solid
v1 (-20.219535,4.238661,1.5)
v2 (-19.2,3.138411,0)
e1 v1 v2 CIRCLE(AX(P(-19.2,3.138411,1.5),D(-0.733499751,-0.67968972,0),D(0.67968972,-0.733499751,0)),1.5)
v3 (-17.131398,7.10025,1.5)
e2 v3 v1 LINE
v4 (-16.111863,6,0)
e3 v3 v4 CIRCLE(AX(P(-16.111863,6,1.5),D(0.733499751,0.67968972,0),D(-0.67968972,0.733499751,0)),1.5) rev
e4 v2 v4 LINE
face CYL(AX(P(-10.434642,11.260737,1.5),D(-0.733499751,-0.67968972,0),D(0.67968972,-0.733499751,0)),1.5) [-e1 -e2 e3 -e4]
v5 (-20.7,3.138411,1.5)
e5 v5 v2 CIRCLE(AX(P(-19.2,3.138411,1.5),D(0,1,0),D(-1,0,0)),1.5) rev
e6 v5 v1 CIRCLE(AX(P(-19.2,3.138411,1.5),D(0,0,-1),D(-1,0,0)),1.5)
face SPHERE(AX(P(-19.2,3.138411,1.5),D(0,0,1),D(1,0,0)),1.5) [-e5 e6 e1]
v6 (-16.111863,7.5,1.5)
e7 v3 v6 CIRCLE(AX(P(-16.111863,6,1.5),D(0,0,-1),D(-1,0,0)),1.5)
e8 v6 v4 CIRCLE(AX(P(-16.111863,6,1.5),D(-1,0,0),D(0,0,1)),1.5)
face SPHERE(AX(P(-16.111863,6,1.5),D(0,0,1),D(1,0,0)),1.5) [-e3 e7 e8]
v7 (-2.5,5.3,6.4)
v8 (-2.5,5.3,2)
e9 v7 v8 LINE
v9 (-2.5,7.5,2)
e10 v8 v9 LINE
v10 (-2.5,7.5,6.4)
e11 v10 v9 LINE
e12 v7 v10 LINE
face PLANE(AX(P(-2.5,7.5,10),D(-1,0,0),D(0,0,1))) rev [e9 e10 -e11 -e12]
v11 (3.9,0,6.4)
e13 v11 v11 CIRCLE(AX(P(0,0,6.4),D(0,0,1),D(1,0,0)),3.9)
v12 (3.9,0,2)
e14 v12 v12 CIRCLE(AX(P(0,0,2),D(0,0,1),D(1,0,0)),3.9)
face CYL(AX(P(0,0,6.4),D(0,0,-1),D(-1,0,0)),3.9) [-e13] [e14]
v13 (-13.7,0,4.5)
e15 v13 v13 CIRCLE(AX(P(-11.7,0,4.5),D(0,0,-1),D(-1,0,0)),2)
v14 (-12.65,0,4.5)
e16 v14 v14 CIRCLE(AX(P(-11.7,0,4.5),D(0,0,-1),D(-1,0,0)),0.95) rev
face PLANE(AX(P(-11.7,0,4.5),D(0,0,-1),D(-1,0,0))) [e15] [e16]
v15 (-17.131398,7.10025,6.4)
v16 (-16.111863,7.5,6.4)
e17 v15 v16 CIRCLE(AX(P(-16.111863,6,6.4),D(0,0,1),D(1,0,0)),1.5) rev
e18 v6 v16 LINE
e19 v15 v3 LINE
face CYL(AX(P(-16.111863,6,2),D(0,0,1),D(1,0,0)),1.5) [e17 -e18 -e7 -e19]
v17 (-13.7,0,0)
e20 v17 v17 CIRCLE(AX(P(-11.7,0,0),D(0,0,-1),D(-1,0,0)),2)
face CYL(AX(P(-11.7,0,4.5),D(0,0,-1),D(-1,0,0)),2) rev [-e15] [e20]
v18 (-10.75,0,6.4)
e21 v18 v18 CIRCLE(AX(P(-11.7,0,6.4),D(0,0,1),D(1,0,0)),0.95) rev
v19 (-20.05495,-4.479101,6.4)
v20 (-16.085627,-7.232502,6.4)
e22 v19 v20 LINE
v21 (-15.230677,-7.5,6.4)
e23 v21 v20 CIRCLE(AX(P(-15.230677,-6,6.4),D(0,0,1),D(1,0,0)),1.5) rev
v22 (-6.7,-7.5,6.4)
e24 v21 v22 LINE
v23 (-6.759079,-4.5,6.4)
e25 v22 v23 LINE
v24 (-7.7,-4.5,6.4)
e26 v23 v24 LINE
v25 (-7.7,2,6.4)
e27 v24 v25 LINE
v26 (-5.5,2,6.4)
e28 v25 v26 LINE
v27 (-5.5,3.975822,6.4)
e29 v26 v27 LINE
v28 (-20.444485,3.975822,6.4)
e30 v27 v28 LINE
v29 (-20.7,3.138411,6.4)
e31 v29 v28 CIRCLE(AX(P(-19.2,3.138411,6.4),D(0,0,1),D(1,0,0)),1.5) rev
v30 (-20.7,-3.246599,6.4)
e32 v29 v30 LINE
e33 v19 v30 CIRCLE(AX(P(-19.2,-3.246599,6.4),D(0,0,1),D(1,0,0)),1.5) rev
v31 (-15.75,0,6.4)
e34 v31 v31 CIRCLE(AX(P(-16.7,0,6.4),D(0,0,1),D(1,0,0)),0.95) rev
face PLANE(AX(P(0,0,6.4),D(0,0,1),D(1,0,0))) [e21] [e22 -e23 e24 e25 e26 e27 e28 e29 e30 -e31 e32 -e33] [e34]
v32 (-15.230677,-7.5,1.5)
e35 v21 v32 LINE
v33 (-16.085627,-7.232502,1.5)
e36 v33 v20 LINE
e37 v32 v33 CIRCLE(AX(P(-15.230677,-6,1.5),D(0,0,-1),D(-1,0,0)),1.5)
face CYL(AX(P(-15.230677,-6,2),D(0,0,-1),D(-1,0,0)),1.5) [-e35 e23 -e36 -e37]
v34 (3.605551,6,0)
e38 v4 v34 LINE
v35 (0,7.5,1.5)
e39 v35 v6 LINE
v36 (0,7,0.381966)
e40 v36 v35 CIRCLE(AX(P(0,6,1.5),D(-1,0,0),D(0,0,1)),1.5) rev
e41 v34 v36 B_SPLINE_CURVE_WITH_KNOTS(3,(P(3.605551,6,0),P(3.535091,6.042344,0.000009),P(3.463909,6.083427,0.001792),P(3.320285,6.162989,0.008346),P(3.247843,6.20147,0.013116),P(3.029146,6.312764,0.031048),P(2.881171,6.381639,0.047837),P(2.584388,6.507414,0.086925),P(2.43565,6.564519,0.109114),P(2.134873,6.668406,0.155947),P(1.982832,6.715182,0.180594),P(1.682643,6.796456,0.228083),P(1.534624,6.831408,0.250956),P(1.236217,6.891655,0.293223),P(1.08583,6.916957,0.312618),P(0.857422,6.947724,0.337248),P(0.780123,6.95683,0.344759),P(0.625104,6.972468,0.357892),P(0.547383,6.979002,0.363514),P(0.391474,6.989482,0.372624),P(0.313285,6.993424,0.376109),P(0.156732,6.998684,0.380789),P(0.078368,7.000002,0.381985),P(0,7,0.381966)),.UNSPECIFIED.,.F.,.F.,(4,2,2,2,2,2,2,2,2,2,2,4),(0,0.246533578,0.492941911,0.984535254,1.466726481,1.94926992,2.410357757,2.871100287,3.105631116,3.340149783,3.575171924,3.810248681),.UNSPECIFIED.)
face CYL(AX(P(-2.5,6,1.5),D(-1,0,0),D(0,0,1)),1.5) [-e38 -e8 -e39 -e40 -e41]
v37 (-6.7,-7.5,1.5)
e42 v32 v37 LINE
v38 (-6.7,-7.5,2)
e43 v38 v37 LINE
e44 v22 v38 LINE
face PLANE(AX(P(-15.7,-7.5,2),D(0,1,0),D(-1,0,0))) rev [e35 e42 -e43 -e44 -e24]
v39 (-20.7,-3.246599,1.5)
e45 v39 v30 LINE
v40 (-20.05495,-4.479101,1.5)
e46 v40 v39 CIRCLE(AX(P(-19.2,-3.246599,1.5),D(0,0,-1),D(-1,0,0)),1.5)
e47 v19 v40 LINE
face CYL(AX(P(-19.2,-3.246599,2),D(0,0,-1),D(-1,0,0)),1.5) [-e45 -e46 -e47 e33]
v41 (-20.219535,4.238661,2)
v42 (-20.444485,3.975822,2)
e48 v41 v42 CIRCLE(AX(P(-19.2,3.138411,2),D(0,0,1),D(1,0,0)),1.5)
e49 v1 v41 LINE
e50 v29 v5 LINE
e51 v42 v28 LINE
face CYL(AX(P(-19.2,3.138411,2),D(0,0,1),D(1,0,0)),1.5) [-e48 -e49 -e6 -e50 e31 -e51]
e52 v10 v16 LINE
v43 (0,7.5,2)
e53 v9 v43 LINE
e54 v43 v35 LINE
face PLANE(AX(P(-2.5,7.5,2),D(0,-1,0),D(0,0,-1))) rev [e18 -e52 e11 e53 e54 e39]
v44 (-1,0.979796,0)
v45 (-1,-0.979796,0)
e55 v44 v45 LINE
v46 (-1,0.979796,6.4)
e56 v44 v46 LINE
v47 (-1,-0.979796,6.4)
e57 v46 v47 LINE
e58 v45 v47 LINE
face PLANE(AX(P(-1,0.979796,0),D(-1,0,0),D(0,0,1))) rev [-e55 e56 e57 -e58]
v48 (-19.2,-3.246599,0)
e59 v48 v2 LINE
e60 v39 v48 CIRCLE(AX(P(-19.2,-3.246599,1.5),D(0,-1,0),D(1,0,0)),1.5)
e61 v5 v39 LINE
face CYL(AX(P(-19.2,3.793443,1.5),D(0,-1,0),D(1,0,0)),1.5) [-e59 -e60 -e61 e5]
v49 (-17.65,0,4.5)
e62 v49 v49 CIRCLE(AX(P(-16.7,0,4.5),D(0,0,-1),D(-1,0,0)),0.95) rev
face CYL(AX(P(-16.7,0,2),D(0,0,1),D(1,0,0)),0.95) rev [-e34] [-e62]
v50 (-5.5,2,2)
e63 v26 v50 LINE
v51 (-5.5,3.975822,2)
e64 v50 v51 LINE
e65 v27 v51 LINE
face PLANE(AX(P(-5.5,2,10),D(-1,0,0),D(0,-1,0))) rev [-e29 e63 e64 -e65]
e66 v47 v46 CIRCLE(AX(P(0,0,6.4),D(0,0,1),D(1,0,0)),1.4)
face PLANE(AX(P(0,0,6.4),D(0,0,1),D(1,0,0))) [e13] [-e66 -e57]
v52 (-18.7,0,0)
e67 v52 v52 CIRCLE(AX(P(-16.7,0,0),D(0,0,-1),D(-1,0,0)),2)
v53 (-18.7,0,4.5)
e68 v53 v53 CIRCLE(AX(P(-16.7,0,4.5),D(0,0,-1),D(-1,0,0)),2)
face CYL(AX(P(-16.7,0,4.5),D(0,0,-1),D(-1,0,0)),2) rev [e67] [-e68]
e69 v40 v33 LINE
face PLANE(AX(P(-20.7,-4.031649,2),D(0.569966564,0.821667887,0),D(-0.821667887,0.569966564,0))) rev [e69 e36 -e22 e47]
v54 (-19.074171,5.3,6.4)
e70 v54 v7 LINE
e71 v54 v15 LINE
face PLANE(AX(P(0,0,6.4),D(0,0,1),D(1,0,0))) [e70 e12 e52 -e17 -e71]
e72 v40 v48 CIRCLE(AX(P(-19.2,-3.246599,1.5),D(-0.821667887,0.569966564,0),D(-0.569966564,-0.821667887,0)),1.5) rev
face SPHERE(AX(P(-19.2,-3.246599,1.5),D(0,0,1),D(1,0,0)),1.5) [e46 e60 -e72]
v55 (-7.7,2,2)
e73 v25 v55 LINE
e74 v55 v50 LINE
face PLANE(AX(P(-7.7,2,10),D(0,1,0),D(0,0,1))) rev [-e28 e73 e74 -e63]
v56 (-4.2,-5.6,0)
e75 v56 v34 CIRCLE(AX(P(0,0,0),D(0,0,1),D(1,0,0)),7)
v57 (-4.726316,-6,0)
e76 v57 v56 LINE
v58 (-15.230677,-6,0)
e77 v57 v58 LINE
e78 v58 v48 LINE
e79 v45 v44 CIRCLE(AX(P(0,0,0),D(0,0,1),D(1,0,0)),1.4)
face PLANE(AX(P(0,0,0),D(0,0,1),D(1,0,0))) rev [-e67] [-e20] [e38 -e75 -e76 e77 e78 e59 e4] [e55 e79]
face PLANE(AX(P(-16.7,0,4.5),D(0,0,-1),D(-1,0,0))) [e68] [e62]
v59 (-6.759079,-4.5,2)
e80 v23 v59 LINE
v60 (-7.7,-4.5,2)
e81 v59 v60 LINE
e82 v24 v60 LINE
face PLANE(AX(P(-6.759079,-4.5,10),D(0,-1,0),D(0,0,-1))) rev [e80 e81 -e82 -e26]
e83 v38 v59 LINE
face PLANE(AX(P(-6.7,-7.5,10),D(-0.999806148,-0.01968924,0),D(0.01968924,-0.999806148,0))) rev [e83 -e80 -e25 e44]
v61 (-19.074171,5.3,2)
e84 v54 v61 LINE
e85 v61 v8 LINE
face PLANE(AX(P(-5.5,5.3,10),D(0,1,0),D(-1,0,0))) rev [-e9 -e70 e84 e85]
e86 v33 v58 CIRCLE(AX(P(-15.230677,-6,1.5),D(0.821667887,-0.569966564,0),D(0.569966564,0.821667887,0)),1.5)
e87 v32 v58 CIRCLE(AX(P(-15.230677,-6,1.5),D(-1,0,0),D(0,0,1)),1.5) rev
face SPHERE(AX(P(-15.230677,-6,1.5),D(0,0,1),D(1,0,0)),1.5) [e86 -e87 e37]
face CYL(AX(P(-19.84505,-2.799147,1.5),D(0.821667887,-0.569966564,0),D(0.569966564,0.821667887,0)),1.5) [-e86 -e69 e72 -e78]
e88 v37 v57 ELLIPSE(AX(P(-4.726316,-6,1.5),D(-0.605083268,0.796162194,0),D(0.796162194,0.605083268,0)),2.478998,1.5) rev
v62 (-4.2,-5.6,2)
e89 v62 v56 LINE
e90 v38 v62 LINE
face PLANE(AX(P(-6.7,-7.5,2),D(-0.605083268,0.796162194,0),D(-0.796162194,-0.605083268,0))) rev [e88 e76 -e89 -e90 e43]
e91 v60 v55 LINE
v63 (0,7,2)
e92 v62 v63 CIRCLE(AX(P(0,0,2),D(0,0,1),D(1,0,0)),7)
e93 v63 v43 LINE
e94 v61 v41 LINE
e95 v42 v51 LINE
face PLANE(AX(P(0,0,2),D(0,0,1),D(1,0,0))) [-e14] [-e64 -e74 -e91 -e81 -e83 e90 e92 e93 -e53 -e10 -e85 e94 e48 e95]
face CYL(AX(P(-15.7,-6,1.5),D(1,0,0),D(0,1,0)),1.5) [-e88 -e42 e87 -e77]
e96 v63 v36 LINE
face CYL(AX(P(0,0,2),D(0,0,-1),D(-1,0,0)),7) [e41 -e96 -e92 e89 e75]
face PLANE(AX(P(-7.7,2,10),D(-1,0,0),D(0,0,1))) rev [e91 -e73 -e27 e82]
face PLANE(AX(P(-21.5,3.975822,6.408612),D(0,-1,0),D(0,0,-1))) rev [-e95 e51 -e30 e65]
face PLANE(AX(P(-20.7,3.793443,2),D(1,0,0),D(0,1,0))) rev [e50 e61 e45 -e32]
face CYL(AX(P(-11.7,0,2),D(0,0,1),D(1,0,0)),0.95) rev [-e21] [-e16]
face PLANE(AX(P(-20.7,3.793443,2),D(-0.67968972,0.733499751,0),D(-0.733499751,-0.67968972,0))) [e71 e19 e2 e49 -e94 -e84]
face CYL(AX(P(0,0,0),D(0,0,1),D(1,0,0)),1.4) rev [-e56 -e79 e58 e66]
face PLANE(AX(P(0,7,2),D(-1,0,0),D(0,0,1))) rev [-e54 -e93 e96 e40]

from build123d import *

# Parameters (mm, degrees)
BOSS_EXTRUDE1_DEPTH = 2
BOSS_EXTRUDE2_DEPTH = 8
SKETCH24_R          = 3.9
BOSS_EXTRUDE5_DEPTH = 4.4
SKETCH30_W          = 4.40861202
SKETCH30_H          = 1.324178481
CUT_EXTRUDE12_DEPTH = 16
CUT_EXTRUDE11_DEPTH = 23.928148639
FILLET1_R           = 1.5
SKETCH34_W          = 1.5
SKETCH34_H          = 1.5
CUT_EXTRUDE13_DEPTH = 8
SKETCH36_R          = 0.95
CUT_EXTRUDE15_DEPTH = 8
SKETCH37_R          = 2
CUT_EXTRUDE16_DEPTH = 4.5
SKETCH38_W          = 3
SKETCH38_H          = 1.25
CUT_EXTRUDE17_DEPTH = 3.6


with BuildPart() as part:
    # Sketch2 → Boss-Extrude1 (new body)
    with BuildSketch(Plane.XY):
        with BuildLine():
            Line((-2.5, 7.5), (-16.7, 7.5))
            Line((-16.7, 7.5), (-20.7, 3.793442666))
            Line((-20.7, 3.793442666), (-20.7, -4.031648778))
            Line((-20.7, -4.031648778), (-15.7, -7.5))
            Line((-15.7, -7.5), (-6.7, -7.5))
            Line((-6.7, -7.5), (-4.2, -5.6))
            ThreePointArc((-4.2, -5.6), (3.130495168, -6.260990337), (7, 0))
            ThreePointArc((7, 0), (4.949747468, 4.949747468), (0, 7))
            Line((0, 7), (0, 7.5))
            Line((0, 7.5), (-2.5, 7.5))
        make_face()
    extrude(amount=BOSS_EXTRUDE1_DEPTH)

    # Sketch4 → Boss-Extrude2 (add)
    with BuildSketch(Plane.XY.offset(2)):
        Polygon((-15.7, -7.5), (-6.7, -7.5), (-6.759079174, -4.5), (-7.7, -4.5), (-7.7, 2), (-5.5, 2), (-5.5, 5.3), (-2.5, 5.3), (-2.5, 7.5), (-16.7, 7.5), (-20.7, 3.793442666), (-20.7, -4.031648778), align=None)
    extrude(amount=BOSS_EXTRUDE2_DEPTH)

    # Sketch24 → Boss-Extrude5 (add)
    with BuildSketch(Plane.XY.offset(2)):
        Circle(SKETCH24_R)
    extrude(amount=BOSS_EXTRUDE5_DEPTH)

    # Sketch30 → Cut-Extrude12 (cut)
    with BuildSketch(Plane(origin=(-5.5, 0, 0), x_dir=(0, 0, -1), z_dir=(1, 0, 0))):
        with Locations((-4.20430601, 4.63791076)):
            Rectangle(SKETCH30_W, SKETCH30_H)
    extrude(amount=-CUT_EXTRUDE12_DEPTH, mode=Mode.SUBTRACT)

    # Sketch28 → Cut-Extrude11 (cut, through all)
    with BuildSketch(Plane.XY.offset(6.4)):
        with BuildLine():
            Line((-1, 0.979795897), (-1, -0.979795897))
            ThreePointArc((-1, -0.979795897), (1.4, 0), (-1, 0.979795897))
        make_face()
    extrude(amount=-CUT_EXTRUDE11_DEPTH, mode=Mode.SUBTRACT)

    # Fillet1
    # the kernel refuses this fillet: 1.5 mm, written as the material it takes off along each edge
    with BuildSketch(Plane(origin=(-15.230677435, -6, 1.5), x_dir=(-0.5699665637840448, -0.8216678867816415, 0), z_dir=(0, 0, -1))) as fillet1_piece_1_section:
        Polygon((0, 0), (FILLET1_R * 1.02, 0), (FILLET1_R * 1.02, -FILLET1_R * 0.319139344377), (FILLET1_R * 0.838101244517, -FILLET1_R * 0.58136589506), align=None)
    fillet1_piece_1 = extrude(amount=FILLET1_R * 1.02, mode=Mode.PRIVATE)
    fillet1_piece_1 = fillet1_piece_1 - Plane(origin=(-15.230677435, -6, 1.5), x_dir=(0.29860685961507855, 0.9543762064253388, 0), z_dir=(0, 0, -1)) * Sphere(FILLET1_R, mode=Mode.PRIVATE)
    add(fillet1_piece_1, mode=Mode.SUBTRACT)
    with BuildSketch(Plane(origin=(-16.11186344, 6, 1.5), x_dir=(-0.6796897201843015, 0.7334997506991983, 0), z_dir=(0, 0, -1))) as fillet1_piece_2_section:
        Polygon((0, 0), (FILLET1_R * 1.02, 0), (FILLET1_R * 1.02, FILLET1_R * 0.399932860855), (FILLET1_R * 0.748169745713, FILLET1_R * 0.693283514588), align=None)
    fillet1_piece_2 = extrude(amount=FILLET1_R * 1.02, mode=Mode.PRIVATE)
    fillet1_piece_2 = fillet1_piece_2 - Plane(origin=(-16.11186344, 6, 1.5), x_dir=(0.3650344157067945, -0.9309940254102596, 0), z_dir=(0, 0, -1)) * Sphere(FILLET1_R, mode=Mode.PRIVATE)
    add(fillet1_piece_2, mode=Mode.SUBTRACT)
    with BuildSketch(Plane(origin=(-19.2, 3.138411196, 1.5), x_dir=(-0.6796897201843015, 0.7334997506991983, 0), z_dir=(0, 0, -1))) as fillet1_piece_3_section:
        Polygon((0, 0), (FILLET1_R * 1.02, 0), (FILLET1_R * 1.02, -FILLET1_R * 0.445421399395), (FILLET1_R * 0.693283514588, -FILLET1_R * 0.748169745713), align=None)
    fillet1_piece_3 = extrude(amount=FILLET1_R * 1.02, mode=Mode.PRIVATE)
    fillet1_piece_3 = fillet1_piece_3 - Plane(origin=(-19.2, 3.138411196, 1.5), x_dir=(0.9164304993244992, -0.40019387789901173, 0), z_dir=(0, 0, -1)) * Sphere(FILLET1_R, mode=Mode.PRIVATE)
    add(fillet1_piece_3, mode=Mode.SUBTRACT)
    with BuildSketch(Plane(origin=(-19.2, -3.246599046, 1.5), x_dir=(-0.5699665637840448, -0.8216678867816415, 0), z_dir=(0, 0, -1))) as fillet1_piece_4_section:
        Polygon((0, 0), (FILLET1_R * 1.02, 0), (FILLET1_R * 1.02, FILLET1_R * 0.533833817771), (FILLET1_R * 0.58136589506, FILLET1_R * 0.838101244517), align=None)
    fillet1_piece_4 = extrude(amount=FILLET1_R * 1.02, mode=Mode.PRIVATE)
    fillet1_piece_4 = fillet1_piece_4 - Plane(origin=(-19.2, -3.246599046, 1.5), x_dir=(0.8859928227090906, 0.46369895202380795, 0), z_dir=(0, 0, -1)) * Sphere(FILLET1_R, mode=Mode.PRIVATE)
    add(fillet1_piece_4, mode=Mode.SUBTRACT)
    with BuildSketch(Plane(origin=(-15.230677435, -7.5, 0), x_dir=(0, 1, 0), z_dir=(1, 0, 0))) as fillet1_piece_5_section:
        with BuildLine():
            CenterArc((FILLET1_R, FILLET1_R), FILLET1_R, 180, 90)
            Line((0, FILLET1_R), (0, 0))
            Line((0, 0), (FILLET1_R, 0))
        make_face()
    fillet1_piece_5 = extrude(amount=12.280677435, mode=Mode.PRIVATE)
    fillet1_piece_5 = split(fillet1_piece_5, bisect_by=Plane(origin=(-9.092127217, -9.318016685, 0.3282266), z_dir=(-0.6050832675335577, 0.7961621941231027, 0)), keep=Keep.TOP, mode=Mode.PRIVATE)
    add(fillet1_piece_5, mode=Mode.SUBTRACT)
    with BuildSketch(Plane(origin=(3.75, 7.5, 0), x_dir=(0, 0, 1), z_dir=(-1, 0, 0))) as fillet1_piece_6:
        with BuildLine():
            CenterArc((FILLET1_R, -FILLET1_R), FILLET1_R, 90, 90)
            Line((0, -FILLET1_R), (0, 0))
            Line((0, 0), (FILLET1_R, 0))
        make_face()
    extrude(amount=19.86186344, mode=Mode.SUBTRACT)
    with BuildSketch(Plane(origin=(-17.13139802, 7.100249626, 0), x_dir=(0.6796897201843014, -0.7334997506991981, 0), z_dir=(-0.7334997506991983, -0.6796897201843015, 0))) as fillet1_piece_7:
        with BuildLine():
            CenterArc((FILLET1_R, FILLET1_R), FILLET1_R, 180, 90)
            Line((0, FILLET1_R), (0, 0))
            Line((0, 0), (FILLET1_R, 0))
        make_face()
    extrude(amount=4.21013989, mode=Mode.SUBTRACT)
    with BuildSketch(Plane(origin=(-20.054949846, -4.479100876, 0), x_dir=(0.5699665637840448, 0.8216678867816416, 0), z_dir=(0.8216678867816415, -0.5699665637840448, 0))) as fillet1_piece_8:
        with BuildLine():
            CenterArc((FILLET1_R, FILLET1_R), FILLET1_R, 180, 90)
            Line((0, FILLET1_R), (0, 0))
            Line((0, 0), (FILLET1_R, 0))
        make_face()
    extrude(amount=4.830811364, mode=Mode.SUBTRACT)
    with BuildSketch(Plane(origin=(-20.7, 3.138411196, 0), x_dir=(1, 0, 0), z_dir=(0, -1, 0))) as fillet1_piece_9:
        with BuildLine():
            CenterArc((FILLET1_R, FILLET1_R), FILLET1_R, 180, 90)
            Line((0, FILLET1_R), (0, 0))
            Line((0, 0), (FILLET1_R, 0))
        make_face()
    extrude(amount=6.385010242, mode=Mode.SUBTRACT)
    with BuildSketch(Plane(origin=(-15.7, -7.5, 1.5), x_dir=(1, 0, 0), z_dir=(0, 0, 1))) as fillet1_piece_10:
        with BuildLine():
            CenterArc((FILLET1_R * 0.312881710173, FILLET1_R), FILLET1_R, 235.252105822, 34.747894178)
            Line((-FILLET1_R * 0.257084853611, FILLET1_R * 0.178332113218), (0, 0))
            Line((0, 0), (FILLET1_R * 0.312881710173, 0))
        make_face()
    extrude(amount=9.673306413, mode=Mode.SUBTRACT)
    with BuildSketch(Plane(origin=(-20.7, -4.031648778, 1.5), x_dir=(0, 1, 0), z_dir=(0, 0, 1))) as fillet1_piece_11:
        with BuildLine():
            CenterArc((FILLET1_R * 0.523366488011, -FILLET1_R), FILLET1_R, 90, 55.252105822)
            Line((-FILLET1_R * 0.298301398771, -FILLET1_R * 0.430033436216), (0, 0))
            Line((0, 0), (FILLET1_R * 0.523366488011, 0))
        make_face()
    extrude(amount=10.46262433, mode=Mode.SUBTRACT)
    with BuildSketch(Plane(origin=(-20.7, 3.793442666, 1.5), x_dir=(0.7334997506991984, 0.6796897201843014, 0), z_dir=(0, 0, 1))) as fillet1_piece_12:
        with BuildLine():
            CenterArc((FILLET1_R * 0.436687646465, -FILLET1_R), FILLET1_R, 90, 47.18059856)
            Line((-FILLET1_R * 0.296812104234, -FILLET1_R * 0.320310279816), (0, 0))
            Line((0, 0), (FILLET1_R * 0.436687646465, 0))
        make_face()
    extrude(amount=10.137578674, mode=Mode.SUBTRACT)
    with BuildSketch(Plane(origin=(-16.7, 7.5, 1.5), x_dir=(1, 0, 0), z_dir=(0, 0, 1))) as fillet1_piece_13:
        with BuildLine():
            CenterArc((FILLET1_R * 0.392091040054, -FILLET1_R), FILLET1_R, 90, 42.81940144)
            Line((-FILLET1_R * 0.287598680131, -FILLET1_R * 0.266500249301), (0, 0))
            Line((0, 0), (FILLET1_R * 0.392091040054, 0))
        make_face()
    extrude(amount=9.9703414, mode=Mode.SUBTRACT)

    # Sketch34 → Cut-Extrude13 (cut, along a direction that is not the sketch's normal)
    with BuildSketch(Plane.XZ.offset(-2)):
        with Locations((-6.95, 10)):
            Rectangle(SKETCH34_W, SKETCH34_H)
    extrude(amount=-CUT_EXTRUDE13_DEPTH, dir=(0.6685833876565112, -0.7436371788377336, 0), mode=Mode.SUBTRACT)

    # Sketch36 → Cut-Extrude15 (cut)
    with BuildSketch(Plane.XY.offset(10)):
        with Locations((-11.7, 0)):
            Circle(SKETCH36_R)
        with Locations((-16.7, 0)):
            Circle(SKETCH36_R)
    extrude(amount=-CUT_EXTRUDE15_DEPTH, mode=Mode.SUBTRACT)

    # Sketch37 → Cut-Extrude16 (cut)
    with BuildSketch(Plane(origin=(0, 0, 0), x_dir=(-1, 0, 0), z_dir=(0, 0, -1))):
        with Locations((11.7, 0)):
            Circle(SKETCH37_R)
        with Locations((16.7, 0)):
            Circle(SKETCH37_R)
    extrude(amount=-CUT_EXTRUDE16_DEPTH, mode=Mode.SUBTRACT)

    # Sketch38 → Cut-Extrude17 (cut)
    with BuildSketch(Plane.XY.offset(10)):
        with Locations((-4, 5.925)):
            Rectangle(SKETCH38_W, SKETCH38_H)
    extrude(amount=-CUT_EXTRUDE17_DEPTH, mode=Mode.SUBTRACT)


with BuildPart() as body_2:
    # Split1: the piece on the far side of the plane
    add(part.part)
    split(bisect_by=Plane.XY.offset(6.4), keep=Keep.BOTTOM)


with BuildPart() as part_1:
    add(part.part)

    # Split1
    split(bisect_by=Plane.XY.offset(6.4), keep=Keep.TOP)


solid = body_2.part
